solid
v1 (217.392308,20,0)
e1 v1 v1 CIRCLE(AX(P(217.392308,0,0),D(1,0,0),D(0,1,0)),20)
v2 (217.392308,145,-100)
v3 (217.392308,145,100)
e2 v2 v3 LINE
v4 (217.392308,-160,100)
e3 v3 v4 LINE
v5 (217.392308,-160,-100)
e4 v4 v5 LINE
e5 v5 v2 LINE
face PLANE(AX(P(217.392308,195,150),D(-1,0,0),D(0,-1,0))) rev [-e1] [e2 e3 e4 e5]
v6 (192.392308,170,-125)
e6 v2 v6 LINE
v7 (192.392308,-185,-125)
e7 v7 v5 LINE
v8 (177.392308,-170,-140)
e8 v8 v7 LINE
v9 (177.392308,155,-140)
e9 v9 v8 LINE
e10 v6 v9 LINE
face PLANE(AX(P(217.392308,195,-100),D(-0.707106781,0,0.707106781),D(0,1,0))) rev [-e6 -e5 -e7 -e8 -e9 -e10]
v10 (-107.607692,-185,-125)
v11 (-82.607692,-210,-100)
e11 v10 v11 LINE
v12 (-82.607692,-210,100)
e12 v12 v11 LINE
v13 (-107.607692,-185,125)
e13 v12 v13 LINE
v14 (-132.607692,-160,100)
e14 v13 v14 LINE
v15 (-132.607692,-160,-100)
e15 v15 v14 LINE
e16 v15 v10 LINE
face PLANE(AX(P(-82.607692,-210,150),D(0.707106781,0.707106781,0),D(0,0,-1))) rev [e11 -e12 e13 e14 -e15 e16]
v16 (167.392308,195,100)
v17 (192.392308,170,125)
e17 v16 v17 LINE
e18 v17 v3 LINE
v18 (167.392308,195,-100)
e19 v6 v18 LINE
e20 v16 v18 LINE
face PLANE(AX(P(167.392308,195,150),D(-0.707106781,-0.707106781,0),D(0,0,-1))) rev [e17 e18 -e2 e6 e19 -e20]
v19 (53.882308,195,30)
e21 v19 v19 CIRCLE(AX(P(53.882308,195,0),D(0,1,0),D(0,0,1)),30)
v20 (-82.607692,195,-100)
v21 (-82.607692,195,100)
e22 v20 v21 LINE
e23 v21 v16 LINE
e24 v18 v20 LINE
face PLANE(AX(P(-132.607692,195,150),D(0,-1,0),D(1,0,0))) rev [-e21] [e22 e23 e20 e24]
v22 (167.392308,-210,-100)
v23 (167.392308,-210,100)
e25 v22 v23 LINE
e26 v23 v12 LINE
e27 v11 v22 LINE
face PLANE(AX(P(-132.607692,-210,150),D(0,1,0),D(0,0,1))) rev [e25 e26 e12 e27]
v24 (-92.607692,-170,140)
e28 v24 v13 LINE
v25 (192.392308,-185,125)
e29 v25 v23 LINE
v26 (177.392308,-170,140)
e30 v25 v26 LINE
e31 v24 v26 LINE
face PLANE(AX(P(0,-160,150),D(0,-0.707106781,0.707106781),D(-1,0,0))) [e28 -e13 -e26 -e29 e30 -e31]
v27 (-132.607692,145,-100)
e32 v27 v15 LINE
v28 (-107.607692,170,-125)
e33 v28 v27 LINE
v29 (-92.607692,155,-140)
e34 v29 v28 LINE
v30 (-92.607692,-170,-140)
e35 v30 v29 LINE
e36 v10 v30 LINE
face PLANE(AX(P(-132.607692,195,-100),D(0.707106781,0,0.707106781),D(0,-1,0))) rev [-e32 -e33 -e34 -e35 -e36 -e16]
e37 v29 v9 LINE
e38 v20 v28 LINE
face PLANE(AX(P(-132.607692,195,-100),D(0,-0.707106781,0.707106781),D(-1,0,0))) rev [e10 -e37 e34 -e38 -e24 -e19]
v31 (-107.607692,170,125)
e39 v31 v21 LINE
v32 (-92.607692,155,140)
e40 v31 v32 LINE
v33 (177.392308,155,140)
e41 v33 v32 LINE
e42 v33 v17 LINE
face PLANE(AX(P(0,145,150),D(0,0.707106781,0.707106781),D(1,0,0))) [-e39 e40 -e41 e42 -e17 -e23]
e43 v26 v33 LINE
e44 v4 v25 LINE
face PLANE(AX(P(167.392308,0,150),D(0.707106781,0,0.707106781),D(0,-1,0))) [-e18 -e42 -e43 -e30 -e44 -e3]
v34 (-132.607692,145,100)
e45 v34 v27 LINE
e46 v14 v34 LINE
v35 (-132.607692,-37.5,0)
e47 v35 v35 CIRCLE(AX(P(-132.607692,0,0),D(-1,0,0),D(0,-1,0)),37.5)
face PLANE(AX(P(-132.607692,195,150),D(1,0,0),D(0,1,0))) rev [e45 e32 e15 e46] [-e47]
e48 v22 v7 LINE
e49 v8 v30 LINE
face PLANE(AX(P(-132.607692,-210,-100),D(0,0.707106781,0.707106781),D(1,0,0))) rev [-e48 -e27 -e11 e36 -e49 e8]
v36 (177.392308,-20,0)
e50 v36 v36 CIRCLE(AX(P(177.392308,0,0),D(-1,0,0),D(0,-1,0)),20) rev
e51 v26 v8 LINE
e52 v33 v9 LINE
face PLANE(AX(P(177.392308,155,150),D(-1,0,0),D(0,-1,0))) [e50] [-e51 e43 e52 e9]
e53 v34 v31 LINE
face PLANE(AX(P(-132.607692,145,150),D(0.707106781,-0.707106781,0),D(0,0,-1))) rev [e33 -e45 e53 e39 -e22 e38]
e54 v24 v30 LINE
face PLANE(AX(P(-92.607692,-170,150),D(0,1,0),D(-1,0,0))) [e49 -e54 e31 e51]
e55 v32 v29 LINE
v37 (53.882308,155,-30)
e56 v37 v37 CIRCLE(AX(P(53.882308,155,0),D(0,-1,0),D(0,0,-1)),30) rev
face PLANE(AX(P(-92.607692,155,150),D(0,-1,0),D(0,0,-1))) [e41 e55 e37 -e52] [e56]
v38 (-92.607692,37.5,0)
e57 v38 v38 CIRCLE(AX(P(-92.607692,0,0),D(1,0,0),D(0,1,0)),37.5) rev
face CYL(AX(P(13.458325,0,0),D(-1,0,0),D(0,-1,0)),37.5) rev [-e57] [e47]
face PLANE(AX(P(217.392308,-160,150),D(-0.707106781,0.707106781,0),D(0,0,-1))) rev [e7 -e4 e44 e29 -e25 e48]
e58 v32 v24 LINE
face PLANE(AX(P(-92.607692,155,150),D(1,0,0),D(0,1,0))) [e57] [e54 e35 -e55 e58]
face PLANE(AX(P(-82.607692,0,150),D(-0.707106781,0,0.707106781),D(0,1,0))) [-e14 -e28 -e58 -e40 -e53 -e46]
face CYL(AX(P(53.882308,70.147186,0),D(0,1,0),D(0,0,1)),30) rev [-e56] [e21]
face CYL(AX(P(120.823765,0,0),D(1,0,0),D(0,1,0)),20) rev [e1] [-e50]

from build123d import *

# Parameters (mm, degrees)
SKETCH1_W           = 350
SKETCH1_H           = 405
SKETCH1_W_2         = 270
SKETCH1_H_2         = 325
BOSS_EXTRUDE1_DEPTH = 150
SKETCH2_R           = 37.5
CUT_EXTRUDE1_DEPTH  = 40
SKETCH3_R           = 20
CUT_EXTRUDE2_DEPTH  = 40
SKETCH4_R           = 30
CUT_EXTRUDE3_DEPTH  = 40
CHAMFER1_SIZE       = 50
CHAMFER2_SIZE       = 50
CHAMFER3_SIZE       = 50


with BuildPart() as part:
    # Sketch1 → Boss-Extrude1 (new, symmetric)
    with BuildSketch(Plane.XY):
        with Locations((42.392307941, -7.5)):
            Rectangle(SKETCH1_W, SKETCH1_H)
        with Locations((42.392307941, -7.5)):
            Rectangle(SKETCH1_W_2, SKETCH1_H_2, mode=Mode.SUBTRACT)
    extrude(amount=BOSS_EXTRUDE1_DEPTH, both=True)

    # Sketch2 → Cut-Extrude1 (cut)
    with BuildSketch(Plane.ZY.offset(132.607692059)):
        with Locations(Location((0, 0, 0), (0, 0, 270))):
            Circle(SKETCH2_R)
    extrude(amount=-CUT_EXTRUDE1_DEPTH, mode=Mode.SUBTRACT)

    # Sketch3 → Cut-Extrude2 (cut)
    with BuildSketch(Plane(origin=(217.392307941, 0, 0), x_dir=(0, 0, -1), z_dir=(1, 0, 0))):
        with Locations(Location((0, 0, 0), (0, 0, 90))):
            Circle(SKETCH3_R)
    extrude(amount=-CUT_EXTRUDE2_DEPTH, mode=Mode.SUBTRACT)

    # Sketch4 → Cut-Extrude3 (cut)
    with BuildSketch(Plane(origin=(0, 195, 0), x_dir=(1, 0, 0), z_dir=(0, 1, 0))):
        with Locations(Location((53.882307941, 0, 0), (0, 0, 270))):
            Circle(SKETCH4_R)
    extrude(amount=-CUT_EXTRUDE3_DEPTH, mode=Mode.SUBTRACT)

    # Chamfer1
    chamfer1_edges = [part.edges().sort_by_distance(p)[0] for p in [
        (-132.607692059, 195, 0),
        (217.392307941, 195, 0),
        (217.392307941, -210, 0),
        (-132.607692059, -210, 0),
    ]]
    chamfer(chamfer1_edges, length=CHAMFER1_SIZE)

    # Chamfer2
    # the kernel refuses this chamfer: 50 mm, written as the material it takes off along each edge
    with BuildSketch(Plane(origin=(295.97645734, -210, -150), x_dir=(0, 0.9996219169112966, -0.027495876610586587), z_dir=(-1, 0, 0)), Plane(origin=(-211.191841457, 195, 150), x_dir=(0, 0.027495876610586594, -0.9996219169112966), z_dir=(1, 0, 0))) as chamfer2_piece_1:
        Polygon((CHAMFER2_SIZE * 0.999621916911, -CHAMFER2_SIZE * 0.0274958766106), (-CHAMFER2_SIZE * 0.0274958766106, -CHAMFER2_SIZE * 0.999621916911), (0, 0), align=None)
    extrude(amount=507.168298797, mode=Mode.SUBTRACT)
    with BuildSketch(Plane(origin=(-211.191841457, 195, -150), x_dir=(0, 0.027495876610586594, 0.9996219169112966), z_dir=(1, 0, 0)), Plane(origin=(295.97645734, -210, 150), x_dir=(0, 0.9996219169112966, 0.027495876610586587), z_dir=(-1, 0, 0))) as chamfer2_piece_2:
        Polygon((CHAMFER2_SIZE * 0.999621916911, CHAMFER2_SIZE * 0.0274958766106), (-CHAMFER2_SIZE * 0.0274958766106, CHAMFER2_SIZE * 0.999621916911), (0, 0), align=None)
    extrude(amount=507.168298797, mode=Mode.SUBTRACT)

    # Chamfer3
    # the kernel refuses this chamfer: 50 mm, written as the material it takes off along each edge
    with BuildSketch(Plane(origin=(217.392307941, 273.584149398, 150), x_dir=(-0.9996219169112966, 0, 0.027495876610586587), z_dir=(0, -1, 0)), Plane(origin=(-132.607692059, -288.584149398, -150), x_dir=(-0.027495876610586594, 0, 0.9996219169112966), z_dir=(0, 1, 0)), Plane(origin=(217.392307941, 273.584149398, -150), x_dir=(0.027495876610586594, 0, 0.9996219169112966), z_dir=(0, -1, 0))) as chamfer3_piece_1:
        Polygon((CHAMFER3_SIZE * 0.999621916911, CHAMFER3_SIZE * 0.0274958766106), (-CHAMFER3_SIZE * 0.0274958766106, CHAMFER3_SIZE * 0.999621916911), (0, 0), align=None)
    extrude(amount=562.168298797, mode=Mode.SUBTRACT)
    with BuildSketch(Plane(origin=(-132.607692059, -288.584149398, 150), x_dir=(-0.027495876610586594, 0, -0.9996219169112966), z_dir=(0, 1, 0))) as chamfer3_piece_2:
        Polygon((CHAMFER3_SIZE * 0.999621916911, -CHAMFER3_SIZE * 0.0274958766106), (-CHAMFER3_SIZE * 0.0274958766106, -CHAMFER3_SIZE * 0.999621916911), (0, 0), align=None)
    extrude(amount=562.168298797, mode=Mode.SUBTRACT)


solid = part.part
